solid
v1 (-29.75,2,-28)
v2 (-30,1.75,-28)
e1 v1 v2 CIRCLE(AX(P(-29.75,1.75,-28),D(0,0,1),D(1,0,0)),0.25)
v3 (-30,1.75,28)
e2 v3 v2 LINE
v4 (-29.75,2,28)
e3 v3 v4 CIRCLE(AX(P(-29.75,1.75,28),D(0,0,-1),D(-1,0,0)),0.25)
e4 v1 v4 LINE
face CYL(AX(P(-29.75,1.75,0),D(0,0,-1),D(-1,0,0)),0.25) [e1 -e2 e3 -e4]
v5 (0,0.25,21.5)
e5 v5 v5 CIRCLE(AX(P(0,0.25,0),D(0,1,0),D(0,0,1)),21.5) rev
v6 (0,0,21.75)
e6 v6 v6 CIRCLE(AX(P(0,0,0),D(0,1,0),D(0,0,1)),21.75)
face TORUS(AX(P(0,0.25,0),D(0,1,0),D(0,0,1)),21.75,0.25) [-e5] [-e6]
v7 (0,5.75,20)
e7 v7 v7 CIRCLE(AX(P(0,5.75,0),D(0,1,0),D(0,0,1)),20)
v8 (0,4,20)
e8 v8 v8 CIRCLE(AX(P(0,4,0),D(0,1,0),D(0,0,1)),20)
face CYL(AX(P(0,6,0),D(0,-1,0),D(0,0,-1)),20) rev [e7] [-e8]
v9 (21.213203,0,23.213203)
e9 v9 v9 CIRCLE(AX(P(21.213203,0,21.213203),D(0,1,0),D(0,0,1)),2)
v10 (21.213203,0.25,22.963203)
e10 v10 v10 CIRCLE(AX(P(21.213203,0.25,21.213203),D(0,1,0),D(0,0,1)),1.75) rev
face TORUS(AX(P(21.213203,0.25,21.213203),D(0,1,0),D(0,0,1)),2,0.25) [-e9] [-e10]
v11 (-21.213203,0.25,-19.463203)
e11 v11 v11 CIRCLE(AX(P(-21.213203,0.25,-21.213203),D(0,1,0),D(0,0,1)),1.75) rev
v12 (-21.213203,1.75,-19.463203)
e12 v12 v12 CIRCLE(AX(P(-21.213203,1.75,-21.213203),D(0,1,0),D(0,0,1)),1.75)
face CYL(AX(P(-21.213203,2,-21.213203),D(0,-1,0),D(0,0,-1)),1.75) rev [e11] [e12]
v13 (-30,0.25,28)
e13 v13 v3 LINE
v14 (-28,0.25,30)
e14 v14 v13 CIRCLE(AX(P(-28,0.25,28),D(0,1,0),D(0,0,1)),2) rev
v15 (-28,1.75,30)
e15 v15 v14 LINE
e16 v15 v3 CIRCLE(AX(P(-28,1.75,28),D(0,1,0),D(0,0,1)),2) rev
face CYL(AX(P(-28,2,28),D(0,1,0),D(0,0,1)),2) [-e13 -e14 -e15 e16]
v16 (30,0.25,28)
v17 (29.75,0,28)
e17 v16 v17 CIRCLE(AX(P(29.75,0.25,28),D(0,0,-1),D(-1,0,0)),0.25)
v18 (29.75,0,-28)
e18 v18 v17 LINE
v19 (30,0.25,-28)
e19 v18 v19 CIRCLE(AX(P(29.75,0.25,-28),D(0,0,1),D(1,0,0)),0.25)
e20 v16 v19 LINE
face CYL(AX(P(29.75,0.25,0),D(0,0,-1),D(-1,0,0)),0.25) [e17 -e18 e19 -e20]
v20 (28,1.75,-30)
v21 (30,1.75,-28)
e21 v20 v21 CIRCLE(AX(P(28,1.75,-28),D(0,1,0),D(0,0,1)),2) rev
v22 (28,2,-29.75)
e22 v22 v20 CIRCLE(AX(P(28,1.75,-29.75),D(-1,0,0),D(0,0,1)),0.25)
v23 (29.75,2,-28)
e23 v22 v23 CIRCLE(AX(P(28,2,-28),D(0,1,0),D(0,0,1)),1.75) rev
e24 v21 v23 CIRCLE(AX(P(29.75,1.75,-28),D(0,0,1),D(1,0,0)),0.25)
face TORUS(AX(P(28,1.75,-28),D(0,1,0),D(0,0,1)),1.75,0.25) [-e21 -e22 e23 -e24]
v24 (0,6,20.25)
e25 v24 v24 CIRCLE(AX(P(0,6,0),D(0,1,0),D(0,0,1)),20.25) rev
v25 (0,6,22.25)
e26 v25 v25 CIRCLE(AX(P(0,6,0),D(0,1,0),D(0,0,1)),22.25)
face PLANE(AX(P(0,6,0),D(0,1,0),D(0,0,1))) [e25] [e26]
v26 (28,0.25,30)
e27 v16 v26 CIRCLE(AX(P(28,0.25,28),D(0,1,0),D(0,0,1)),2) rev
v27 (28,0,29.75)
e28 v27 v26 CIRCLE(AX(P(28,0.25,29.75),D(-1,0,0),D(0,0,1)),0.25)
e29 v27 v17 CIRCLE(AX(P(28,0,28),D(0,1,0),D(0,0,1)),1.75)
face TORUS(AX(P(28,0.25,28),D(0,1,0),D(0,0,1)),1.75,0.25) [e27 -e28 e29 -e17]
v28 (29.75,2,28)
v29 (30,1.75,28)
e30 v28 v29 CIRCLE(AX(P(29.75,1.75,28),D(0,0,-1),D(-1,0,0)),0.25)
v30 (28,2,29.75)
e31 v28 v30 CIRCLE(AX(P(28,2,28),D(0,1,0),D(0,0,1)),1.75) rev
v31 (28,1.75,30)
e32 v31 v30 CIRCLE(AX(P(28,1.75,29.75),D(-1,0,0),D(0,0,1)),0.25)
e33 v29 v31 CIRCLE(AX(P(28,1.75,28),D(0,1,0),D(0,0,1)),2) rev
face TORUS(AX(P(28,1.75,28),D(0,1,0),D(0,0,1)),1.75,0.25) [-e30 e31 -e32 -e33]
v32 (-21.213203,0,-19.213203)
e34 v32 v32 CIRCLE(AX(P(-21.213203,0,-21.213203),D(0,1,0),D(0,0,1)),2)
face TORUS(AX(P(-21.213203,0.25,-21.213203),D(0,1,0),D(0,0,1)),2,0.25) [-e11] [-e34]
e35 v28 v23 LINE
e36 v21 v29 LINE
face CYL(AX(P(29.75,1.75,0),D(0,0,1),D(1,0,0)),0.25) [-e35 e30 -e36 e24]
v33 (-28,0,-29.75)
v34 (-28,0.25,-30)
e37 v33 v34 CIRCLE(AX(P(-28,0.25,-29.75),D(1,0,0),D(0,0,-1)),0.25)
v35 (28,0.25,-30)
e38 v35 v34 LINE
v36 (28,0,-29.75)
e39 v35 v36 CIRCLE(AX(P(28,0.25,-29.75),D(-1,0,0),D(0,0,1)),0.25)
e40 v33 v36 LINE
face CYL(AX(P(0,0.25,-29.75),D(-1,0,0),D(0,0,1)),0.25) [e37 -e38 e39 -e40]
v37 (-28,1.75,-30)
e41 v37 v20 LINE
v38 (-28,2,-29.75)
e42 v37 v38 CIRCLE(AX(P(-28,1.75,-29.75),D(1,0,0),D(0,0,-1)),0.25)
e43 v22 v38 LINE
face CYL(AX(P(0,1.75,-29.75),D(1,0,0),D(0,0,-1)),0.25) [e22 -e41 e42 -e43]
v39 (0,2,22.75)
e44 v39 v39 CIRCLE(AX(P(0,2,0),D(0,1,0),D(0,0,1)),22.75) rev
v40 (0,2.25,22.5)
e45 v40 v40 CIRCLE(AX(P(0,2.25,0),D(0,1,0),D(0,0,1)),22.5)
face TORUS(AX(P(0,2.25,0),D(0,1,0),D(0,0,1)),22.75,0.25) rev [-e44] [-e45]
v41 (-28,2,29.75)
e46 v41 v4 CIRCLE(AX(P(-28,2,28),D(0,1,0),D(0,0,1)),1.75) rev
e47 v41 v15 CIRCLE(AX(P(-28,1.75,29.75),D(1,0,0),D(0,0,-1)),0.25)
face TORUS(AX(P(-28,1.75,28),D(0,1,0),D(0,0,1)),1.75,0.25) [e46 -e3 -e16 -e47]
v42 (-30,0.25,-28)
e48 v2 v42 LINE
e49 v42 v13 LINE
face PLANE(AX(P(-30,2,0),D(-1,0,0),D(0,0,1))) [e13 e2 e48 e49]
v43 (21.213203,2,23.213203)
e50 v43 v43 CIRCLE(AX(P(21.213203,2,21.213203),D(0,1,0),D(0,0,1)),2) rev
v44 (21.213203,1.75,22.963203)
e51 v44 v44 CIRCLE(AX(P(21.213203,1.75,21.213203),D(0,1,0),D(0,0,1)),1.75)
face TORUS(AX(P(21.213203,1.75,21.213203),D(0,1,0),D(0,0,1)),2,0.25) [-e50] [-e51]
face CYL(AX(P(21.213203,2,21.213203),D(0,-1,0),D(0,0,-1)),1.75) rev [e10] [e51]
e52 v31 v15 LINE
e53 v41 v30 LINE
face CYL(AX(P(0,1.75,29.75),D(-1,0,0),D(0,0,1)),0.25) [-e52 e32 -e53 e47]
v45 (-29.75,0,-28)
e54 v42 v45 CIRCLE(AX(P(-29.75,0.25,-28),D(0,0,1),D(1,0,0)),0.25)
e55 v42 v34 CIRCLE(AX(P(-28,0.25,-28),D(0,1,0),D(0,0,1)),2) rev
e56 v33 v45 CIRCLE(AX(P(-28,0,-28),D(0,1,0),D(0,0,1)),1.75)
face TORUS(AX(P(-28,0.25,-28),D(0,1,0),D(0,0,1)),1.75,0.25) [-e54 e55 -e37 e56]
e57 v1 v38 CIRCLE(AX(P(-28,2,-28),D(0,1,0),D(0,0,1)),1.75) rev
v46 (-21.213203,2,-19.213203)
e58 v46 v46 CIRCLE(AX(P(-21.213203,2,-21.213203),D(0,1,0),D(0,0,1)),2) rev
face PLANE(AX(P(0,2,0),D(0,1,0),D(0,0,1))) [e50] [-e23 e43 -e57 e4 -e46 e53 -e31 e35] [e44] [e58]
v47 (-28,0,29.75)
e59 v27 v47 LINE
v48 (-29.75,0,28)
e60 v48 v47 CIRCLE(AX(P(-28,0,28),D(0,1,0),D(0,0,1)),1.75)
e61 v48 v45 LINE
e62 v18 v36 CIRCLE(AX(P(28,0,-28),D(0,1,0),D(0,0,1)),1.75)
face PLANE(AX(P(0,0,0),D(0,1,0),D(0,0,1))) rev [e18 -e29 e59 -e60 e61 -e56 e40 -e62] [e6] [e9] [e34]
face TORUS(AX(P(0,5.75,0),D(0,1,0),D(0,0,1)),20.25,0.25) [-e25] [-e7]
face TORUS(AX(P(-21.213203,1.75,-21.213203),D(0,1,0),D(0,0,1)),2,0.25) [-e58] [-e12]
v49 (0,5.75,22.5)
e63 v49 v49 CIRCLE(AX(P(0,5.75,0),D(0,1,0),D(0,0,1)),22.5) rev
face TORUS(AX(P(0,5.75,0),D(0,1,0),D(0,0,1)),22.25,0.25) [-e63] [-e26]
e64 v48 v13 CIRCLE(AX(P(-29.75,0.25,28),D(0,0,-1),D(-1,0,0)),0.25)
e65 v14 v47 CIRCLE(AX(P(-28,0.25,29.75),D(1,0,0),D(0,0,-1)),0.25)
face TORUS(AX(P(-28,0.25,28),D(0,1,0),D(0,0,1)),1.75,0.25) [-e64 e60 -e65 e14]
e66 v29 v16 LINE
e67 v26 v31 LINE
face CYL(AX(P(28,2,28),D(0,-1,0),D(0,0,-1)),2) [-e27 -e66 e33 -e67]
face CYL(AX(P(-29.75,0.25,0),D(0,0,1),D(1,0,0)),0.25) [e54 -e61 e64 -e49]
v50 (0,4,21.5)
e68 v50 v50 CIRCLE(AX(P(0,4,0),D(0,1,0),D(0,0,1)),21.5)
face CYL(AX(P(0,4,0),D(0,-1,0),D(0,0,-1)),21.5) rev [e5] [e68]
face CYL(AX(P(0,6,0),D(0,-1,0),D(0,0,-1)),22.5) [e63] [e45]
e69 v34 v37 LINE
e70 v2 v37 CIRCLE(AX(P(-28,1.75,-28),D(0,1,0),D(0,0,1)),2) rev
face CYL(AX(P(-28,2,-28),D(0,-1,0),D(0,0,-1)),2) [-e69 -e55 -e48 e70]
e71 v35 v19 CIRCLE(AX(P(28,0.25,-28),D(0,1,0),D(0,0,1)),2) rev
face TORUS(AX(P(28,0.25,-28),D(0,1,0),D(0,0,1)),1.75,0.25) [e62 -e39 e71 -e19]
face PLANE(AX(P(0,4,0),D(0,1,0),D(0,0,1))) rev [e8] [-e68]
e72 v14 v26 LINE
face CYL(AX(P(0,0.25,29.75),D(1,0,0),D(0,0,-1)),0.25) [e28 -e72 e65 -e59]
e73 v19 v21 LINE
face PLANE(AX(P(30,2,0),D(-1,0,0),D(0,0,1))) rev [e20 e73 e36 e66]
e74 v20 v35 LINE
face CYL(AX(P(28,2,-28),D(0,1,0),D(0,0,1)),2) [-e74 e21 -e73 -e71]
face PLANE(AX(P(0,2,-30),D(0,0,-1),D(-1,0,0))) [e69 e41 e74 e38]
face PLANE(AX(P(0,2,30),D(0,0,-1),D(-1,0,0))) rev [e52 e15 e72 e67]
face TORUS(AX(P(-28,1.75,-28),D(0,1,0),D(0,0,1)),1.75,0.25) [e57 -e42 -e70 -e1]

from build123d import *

# Parameters (mm, degrees)
SKETCH1_W           = 60
SKETCH1_H           = 60
SKETCH1_R           = 22.5
SKETCH1_R_2         = 1.75
BOSS_EXTRUDE1_DEPTH = 2
SKETCH1_2_R         = 22.5
SKETCH1_2_R_2       = 20
BOSS_EXTRUDE2_DEPTH = 6
SKETCH1_4_R         = 21.5
CUT_EXTRUDE1_DEPTH  = 4
FILLET1_R           = 0.25
FILLET2_R           = 2


with BuildPart() as part:
    # Sketch1 → Boss-Extrude1 (new body)
    with BuildSketch(Plane(origin=(0, 0, 0), x_dir=(1, 0, 0), z_dir=(0, 1, 0))):
        Rectangle(SKETCH1_W, SKETCH1_H)
        with Locations(Location((0, 0, 0), (0, 0, 270))):
            Circle(SKETCH1_R, mode=Mode.SUBTRACT)
        with Locations(Location((21.213203436, -21.213203436, 0), (0, 0, 270))):
            Circle(SKETCH1_R_2, mode=Mode.SUBTRACT)
        with Locations(Location((-21.213203436, 21.213203436, 0), (0, 0, 270))):
            Circle(SKETCH1_R_2, mode=Mode.SUBTRACT)
    extrude(amount=BOSS_EXTRUDE1_DEPTH)

    # Sketch1<2> → Boss-Extrude2 (add)
    with BuildSketch(Plane(origin=(0, 0, 0), x_dir=(1, 0, 0), z_dir=(0, 1, 0))):
        with Locations(Location((0, 0, 0), (0, 0, 270))):
            Circle(SKETCH1_2_R)
        with Locations(Location((0, 0, 0), (0, 0, 270))):
            Circle(SKETCH1_2_R_2, mode=Mode.SUBTRACT)
    extrude(amount=BOSS_EXTRUDE2_DEPTH)

    # Sketch1<4> → Cut-Extrude1 (cut)
    with BuildSketch(Plane(origin=(0, 0, 0), x_dir=(1, 0, 0), z_dir=(0, 1, 0))):
        with Locations(Location((0, 0, 0), (0, 0, 270))):
            Circle(SKETCH1_4_R)
    extrude(amount=CUT_EXTRUDE1_DEPTH, mode=Mode.SUBTRACT)

    # Fillet1
    fillet1_edges = [part.edges().sort_by_distance(p)[0] for p in [
        (30, 0, 0),
        (0, 0, 30),
        (-21.213203436, 0, -22.963203436),
        (21.213203436, 0, 19.463203436),
        (21.213203436, 2, 19.463203436),
        (-21.213203436, 2, -22.963203436),
        (0, 2, 30),
        (0, 6, -20),
        (0, 6, -22.5),
        (30, 2, 0),
        (0, 0, -21.5),
        (0, 2, -30),
        (-30, 2, 0),
        (0, 2, -22.5),
        (-30, 0, 0),
        (0, 0, -30),
    ]]
    fillet(fillet1_edges, radius=FILLET1_R)

    # Fillet2
    # the kernel refuses this fillet: 2 mm, written as the material it takes off along each edge
    with BuildSketch(Plane(origin=(-28, 0, 28), x_dir=(0, 0, 1), z_dir=(1, 0, 0))) as fillet2_piece_1:
        with BuildLine():
            CenterArc((1.75, -0.25), 0.25, 0, 90)
            Line((2, -0.25), (2, 0))
            Line((2, 0), (1.75, 0))
        make_face()
    revolve(axis=Axis((-28, 0, 28), (0, -1, 0)), revolution_arc=90, mode=Mode.SUBTRACT)
    with BuildSketch(Plane(origin=(-28, 0, -28), x_dir=(-1, 0, 0), z_dir=(0, 0, 1))) as fillet2_piece_2:
        with BuildLine():
            CenterArc((1.75, -0.25), 0.25, 0, 90)
            Line((2, -0.25), (2, 0))
            Line((2, 0), (1.75, 0))
        make_face()
    revolve(axis=Axis((-28, 0, -28), (0, -1, 0)), revolution_arc=90, mode=Mode.SUBTRACT)
    with BuildSketch(Plane(origin=(28, 0, 28), x_dir=(1, 0, 0), z_dir=(0, 0, -1))) as fillet2_piece_3:
        with BuildLine():
            CenterArc((1.75, -0.25), 0.25, 0, 90)
            Line((2, -0.25), (2, 0))
            Line((2, 0), (1.75, 0))
        make_face()
    revolve(axis=Axis((28, 0, 28), (0, -1, 0)), revolution_arc=90, mode=Mode.SUBTRACT)
    with BuildSketch(Plane(origin=(28, 0, -28), x_dir=(0, 0, -1), z_dir=(-1, 0, 0))) as fillet2_piece_4:
        with BuildLine():
            CenterArc((1.75, -0.25), 0.25, 0, 90)
            Line((2, -0.25), (2, 0))
            Line((2, 0), (1.75, 0))
        make_face()
    revolve(axis=Axis((28, 0, -28), (0, -1, 0)), revolution_arc=90, mode=Mode.SUBTRACT)
    with BuildSketch(Plane(origin=(28, 2, 28), x_dir=(0, 0, 1), z_dir=(-1, 0, 0))) as fillet2_piece_5:
        with BuildLine():
            CenterArc((1.75, -0.25), 0.25, 0, 90)
            Line((2, -0.25), (2, 0))
            Line((2, 0), (1.75, 0))
        make_face()
    revolve(axis=Axis((28, 2, 28), (0, 1, 0)), revolution_arc=90, mode=Mode.SUBTRACT)
    with BuildSketch(Plane(origin=(28, 2, -28), x_dir=(1, 0, 0), z_dir=(0, 0, 1))) as fillet2_piece_6:
        with BuildLine():
            CenterArc((1.75, -0.25), 0.25, 0, 90)
            Line((2, -0.25), (2, 0))
            Line((2, 0), (1.75, 0))
        make_face()
    revolve(axis=Axis((28, 2, -28), (0, 1, 0)), revolution_arc=90, mode=Mode.SUBTRACT)
    with BuildSketch(Plane(origin=(-28, 2, 28), x_dir=(-1, 0, 0), z_dir=(0, 0, -1))) as fillet2_piece_7:
        with BuildLine():
            CenterArc((1.75, -0.25), 0.25, 0, 90)
            Line((2, -0.25), (2, 0))
            Line((2, 0), (1.75, 0))
        make_face()
    revolve(axis=Axis((-28, 2, 28), (0, 1, 0)), revolution_arc=90, mode=Mode.SUBTRACT)
    with BuildSketch(Plane(origin=(-28, 2, -28), x_dir=(0, 0, -1), z_dir=(1, 0, 0))) as fillet2_piece_8:
        with BuildLine():
            CenterArc((1.75, -0.25), 0.25, 0, 90)
            Line((2, -0.25), (2, 0))
            Line((2, 0), (1.75, 0))
        make_face()
    revolve(axis=Axis((-28, 2, -28), (0, 1, 0)), revolution_arc=90, mode=Mode.SUBTRACT)
    with BuildSketch(Plane(origin=(30, 0, -30), x_dir=(0, 0, 1), z_dir=(0, 1, 0)), Plane(origin=(30, 0, 30), x_dir=(-1, 0, 0), z_dir=(0, 1, 0))) as fillet2_piece_9:
        with BuildLine():
            CenterArc((FILLET2_R, -FILLET2_R), FILLET2_R, 90, 90)
            Line((0, -FILLET2_R), (0, 0))
            Line((0, 0), (FILLET2_R, 0))
        make_face()
    extrude(amount=2, mode=Mode.SUBTRACT)
    with BuildSketch(Plane(origin=(-30, 0, -30), x_dir=(0, 0, 1), z_dir=(0, 1, 0)), Plane(origin=(-30, 0, 30), x_dir=(1, 0, 0), z_dir=(0, 1, 0))) as fillet2_piece_10:
        with BuildLine():
            CenterArc((FILLET2_R, FILLET2_R), FILLET2_R, 180, 90)
            Line((0, FILLET2_R), (0, 0))
            Line((0, 0), (FILLET2_R, 0))
        make_face()
    extrude(amount=2, mode=Mode.SUBTRACT)


solid = part.part
